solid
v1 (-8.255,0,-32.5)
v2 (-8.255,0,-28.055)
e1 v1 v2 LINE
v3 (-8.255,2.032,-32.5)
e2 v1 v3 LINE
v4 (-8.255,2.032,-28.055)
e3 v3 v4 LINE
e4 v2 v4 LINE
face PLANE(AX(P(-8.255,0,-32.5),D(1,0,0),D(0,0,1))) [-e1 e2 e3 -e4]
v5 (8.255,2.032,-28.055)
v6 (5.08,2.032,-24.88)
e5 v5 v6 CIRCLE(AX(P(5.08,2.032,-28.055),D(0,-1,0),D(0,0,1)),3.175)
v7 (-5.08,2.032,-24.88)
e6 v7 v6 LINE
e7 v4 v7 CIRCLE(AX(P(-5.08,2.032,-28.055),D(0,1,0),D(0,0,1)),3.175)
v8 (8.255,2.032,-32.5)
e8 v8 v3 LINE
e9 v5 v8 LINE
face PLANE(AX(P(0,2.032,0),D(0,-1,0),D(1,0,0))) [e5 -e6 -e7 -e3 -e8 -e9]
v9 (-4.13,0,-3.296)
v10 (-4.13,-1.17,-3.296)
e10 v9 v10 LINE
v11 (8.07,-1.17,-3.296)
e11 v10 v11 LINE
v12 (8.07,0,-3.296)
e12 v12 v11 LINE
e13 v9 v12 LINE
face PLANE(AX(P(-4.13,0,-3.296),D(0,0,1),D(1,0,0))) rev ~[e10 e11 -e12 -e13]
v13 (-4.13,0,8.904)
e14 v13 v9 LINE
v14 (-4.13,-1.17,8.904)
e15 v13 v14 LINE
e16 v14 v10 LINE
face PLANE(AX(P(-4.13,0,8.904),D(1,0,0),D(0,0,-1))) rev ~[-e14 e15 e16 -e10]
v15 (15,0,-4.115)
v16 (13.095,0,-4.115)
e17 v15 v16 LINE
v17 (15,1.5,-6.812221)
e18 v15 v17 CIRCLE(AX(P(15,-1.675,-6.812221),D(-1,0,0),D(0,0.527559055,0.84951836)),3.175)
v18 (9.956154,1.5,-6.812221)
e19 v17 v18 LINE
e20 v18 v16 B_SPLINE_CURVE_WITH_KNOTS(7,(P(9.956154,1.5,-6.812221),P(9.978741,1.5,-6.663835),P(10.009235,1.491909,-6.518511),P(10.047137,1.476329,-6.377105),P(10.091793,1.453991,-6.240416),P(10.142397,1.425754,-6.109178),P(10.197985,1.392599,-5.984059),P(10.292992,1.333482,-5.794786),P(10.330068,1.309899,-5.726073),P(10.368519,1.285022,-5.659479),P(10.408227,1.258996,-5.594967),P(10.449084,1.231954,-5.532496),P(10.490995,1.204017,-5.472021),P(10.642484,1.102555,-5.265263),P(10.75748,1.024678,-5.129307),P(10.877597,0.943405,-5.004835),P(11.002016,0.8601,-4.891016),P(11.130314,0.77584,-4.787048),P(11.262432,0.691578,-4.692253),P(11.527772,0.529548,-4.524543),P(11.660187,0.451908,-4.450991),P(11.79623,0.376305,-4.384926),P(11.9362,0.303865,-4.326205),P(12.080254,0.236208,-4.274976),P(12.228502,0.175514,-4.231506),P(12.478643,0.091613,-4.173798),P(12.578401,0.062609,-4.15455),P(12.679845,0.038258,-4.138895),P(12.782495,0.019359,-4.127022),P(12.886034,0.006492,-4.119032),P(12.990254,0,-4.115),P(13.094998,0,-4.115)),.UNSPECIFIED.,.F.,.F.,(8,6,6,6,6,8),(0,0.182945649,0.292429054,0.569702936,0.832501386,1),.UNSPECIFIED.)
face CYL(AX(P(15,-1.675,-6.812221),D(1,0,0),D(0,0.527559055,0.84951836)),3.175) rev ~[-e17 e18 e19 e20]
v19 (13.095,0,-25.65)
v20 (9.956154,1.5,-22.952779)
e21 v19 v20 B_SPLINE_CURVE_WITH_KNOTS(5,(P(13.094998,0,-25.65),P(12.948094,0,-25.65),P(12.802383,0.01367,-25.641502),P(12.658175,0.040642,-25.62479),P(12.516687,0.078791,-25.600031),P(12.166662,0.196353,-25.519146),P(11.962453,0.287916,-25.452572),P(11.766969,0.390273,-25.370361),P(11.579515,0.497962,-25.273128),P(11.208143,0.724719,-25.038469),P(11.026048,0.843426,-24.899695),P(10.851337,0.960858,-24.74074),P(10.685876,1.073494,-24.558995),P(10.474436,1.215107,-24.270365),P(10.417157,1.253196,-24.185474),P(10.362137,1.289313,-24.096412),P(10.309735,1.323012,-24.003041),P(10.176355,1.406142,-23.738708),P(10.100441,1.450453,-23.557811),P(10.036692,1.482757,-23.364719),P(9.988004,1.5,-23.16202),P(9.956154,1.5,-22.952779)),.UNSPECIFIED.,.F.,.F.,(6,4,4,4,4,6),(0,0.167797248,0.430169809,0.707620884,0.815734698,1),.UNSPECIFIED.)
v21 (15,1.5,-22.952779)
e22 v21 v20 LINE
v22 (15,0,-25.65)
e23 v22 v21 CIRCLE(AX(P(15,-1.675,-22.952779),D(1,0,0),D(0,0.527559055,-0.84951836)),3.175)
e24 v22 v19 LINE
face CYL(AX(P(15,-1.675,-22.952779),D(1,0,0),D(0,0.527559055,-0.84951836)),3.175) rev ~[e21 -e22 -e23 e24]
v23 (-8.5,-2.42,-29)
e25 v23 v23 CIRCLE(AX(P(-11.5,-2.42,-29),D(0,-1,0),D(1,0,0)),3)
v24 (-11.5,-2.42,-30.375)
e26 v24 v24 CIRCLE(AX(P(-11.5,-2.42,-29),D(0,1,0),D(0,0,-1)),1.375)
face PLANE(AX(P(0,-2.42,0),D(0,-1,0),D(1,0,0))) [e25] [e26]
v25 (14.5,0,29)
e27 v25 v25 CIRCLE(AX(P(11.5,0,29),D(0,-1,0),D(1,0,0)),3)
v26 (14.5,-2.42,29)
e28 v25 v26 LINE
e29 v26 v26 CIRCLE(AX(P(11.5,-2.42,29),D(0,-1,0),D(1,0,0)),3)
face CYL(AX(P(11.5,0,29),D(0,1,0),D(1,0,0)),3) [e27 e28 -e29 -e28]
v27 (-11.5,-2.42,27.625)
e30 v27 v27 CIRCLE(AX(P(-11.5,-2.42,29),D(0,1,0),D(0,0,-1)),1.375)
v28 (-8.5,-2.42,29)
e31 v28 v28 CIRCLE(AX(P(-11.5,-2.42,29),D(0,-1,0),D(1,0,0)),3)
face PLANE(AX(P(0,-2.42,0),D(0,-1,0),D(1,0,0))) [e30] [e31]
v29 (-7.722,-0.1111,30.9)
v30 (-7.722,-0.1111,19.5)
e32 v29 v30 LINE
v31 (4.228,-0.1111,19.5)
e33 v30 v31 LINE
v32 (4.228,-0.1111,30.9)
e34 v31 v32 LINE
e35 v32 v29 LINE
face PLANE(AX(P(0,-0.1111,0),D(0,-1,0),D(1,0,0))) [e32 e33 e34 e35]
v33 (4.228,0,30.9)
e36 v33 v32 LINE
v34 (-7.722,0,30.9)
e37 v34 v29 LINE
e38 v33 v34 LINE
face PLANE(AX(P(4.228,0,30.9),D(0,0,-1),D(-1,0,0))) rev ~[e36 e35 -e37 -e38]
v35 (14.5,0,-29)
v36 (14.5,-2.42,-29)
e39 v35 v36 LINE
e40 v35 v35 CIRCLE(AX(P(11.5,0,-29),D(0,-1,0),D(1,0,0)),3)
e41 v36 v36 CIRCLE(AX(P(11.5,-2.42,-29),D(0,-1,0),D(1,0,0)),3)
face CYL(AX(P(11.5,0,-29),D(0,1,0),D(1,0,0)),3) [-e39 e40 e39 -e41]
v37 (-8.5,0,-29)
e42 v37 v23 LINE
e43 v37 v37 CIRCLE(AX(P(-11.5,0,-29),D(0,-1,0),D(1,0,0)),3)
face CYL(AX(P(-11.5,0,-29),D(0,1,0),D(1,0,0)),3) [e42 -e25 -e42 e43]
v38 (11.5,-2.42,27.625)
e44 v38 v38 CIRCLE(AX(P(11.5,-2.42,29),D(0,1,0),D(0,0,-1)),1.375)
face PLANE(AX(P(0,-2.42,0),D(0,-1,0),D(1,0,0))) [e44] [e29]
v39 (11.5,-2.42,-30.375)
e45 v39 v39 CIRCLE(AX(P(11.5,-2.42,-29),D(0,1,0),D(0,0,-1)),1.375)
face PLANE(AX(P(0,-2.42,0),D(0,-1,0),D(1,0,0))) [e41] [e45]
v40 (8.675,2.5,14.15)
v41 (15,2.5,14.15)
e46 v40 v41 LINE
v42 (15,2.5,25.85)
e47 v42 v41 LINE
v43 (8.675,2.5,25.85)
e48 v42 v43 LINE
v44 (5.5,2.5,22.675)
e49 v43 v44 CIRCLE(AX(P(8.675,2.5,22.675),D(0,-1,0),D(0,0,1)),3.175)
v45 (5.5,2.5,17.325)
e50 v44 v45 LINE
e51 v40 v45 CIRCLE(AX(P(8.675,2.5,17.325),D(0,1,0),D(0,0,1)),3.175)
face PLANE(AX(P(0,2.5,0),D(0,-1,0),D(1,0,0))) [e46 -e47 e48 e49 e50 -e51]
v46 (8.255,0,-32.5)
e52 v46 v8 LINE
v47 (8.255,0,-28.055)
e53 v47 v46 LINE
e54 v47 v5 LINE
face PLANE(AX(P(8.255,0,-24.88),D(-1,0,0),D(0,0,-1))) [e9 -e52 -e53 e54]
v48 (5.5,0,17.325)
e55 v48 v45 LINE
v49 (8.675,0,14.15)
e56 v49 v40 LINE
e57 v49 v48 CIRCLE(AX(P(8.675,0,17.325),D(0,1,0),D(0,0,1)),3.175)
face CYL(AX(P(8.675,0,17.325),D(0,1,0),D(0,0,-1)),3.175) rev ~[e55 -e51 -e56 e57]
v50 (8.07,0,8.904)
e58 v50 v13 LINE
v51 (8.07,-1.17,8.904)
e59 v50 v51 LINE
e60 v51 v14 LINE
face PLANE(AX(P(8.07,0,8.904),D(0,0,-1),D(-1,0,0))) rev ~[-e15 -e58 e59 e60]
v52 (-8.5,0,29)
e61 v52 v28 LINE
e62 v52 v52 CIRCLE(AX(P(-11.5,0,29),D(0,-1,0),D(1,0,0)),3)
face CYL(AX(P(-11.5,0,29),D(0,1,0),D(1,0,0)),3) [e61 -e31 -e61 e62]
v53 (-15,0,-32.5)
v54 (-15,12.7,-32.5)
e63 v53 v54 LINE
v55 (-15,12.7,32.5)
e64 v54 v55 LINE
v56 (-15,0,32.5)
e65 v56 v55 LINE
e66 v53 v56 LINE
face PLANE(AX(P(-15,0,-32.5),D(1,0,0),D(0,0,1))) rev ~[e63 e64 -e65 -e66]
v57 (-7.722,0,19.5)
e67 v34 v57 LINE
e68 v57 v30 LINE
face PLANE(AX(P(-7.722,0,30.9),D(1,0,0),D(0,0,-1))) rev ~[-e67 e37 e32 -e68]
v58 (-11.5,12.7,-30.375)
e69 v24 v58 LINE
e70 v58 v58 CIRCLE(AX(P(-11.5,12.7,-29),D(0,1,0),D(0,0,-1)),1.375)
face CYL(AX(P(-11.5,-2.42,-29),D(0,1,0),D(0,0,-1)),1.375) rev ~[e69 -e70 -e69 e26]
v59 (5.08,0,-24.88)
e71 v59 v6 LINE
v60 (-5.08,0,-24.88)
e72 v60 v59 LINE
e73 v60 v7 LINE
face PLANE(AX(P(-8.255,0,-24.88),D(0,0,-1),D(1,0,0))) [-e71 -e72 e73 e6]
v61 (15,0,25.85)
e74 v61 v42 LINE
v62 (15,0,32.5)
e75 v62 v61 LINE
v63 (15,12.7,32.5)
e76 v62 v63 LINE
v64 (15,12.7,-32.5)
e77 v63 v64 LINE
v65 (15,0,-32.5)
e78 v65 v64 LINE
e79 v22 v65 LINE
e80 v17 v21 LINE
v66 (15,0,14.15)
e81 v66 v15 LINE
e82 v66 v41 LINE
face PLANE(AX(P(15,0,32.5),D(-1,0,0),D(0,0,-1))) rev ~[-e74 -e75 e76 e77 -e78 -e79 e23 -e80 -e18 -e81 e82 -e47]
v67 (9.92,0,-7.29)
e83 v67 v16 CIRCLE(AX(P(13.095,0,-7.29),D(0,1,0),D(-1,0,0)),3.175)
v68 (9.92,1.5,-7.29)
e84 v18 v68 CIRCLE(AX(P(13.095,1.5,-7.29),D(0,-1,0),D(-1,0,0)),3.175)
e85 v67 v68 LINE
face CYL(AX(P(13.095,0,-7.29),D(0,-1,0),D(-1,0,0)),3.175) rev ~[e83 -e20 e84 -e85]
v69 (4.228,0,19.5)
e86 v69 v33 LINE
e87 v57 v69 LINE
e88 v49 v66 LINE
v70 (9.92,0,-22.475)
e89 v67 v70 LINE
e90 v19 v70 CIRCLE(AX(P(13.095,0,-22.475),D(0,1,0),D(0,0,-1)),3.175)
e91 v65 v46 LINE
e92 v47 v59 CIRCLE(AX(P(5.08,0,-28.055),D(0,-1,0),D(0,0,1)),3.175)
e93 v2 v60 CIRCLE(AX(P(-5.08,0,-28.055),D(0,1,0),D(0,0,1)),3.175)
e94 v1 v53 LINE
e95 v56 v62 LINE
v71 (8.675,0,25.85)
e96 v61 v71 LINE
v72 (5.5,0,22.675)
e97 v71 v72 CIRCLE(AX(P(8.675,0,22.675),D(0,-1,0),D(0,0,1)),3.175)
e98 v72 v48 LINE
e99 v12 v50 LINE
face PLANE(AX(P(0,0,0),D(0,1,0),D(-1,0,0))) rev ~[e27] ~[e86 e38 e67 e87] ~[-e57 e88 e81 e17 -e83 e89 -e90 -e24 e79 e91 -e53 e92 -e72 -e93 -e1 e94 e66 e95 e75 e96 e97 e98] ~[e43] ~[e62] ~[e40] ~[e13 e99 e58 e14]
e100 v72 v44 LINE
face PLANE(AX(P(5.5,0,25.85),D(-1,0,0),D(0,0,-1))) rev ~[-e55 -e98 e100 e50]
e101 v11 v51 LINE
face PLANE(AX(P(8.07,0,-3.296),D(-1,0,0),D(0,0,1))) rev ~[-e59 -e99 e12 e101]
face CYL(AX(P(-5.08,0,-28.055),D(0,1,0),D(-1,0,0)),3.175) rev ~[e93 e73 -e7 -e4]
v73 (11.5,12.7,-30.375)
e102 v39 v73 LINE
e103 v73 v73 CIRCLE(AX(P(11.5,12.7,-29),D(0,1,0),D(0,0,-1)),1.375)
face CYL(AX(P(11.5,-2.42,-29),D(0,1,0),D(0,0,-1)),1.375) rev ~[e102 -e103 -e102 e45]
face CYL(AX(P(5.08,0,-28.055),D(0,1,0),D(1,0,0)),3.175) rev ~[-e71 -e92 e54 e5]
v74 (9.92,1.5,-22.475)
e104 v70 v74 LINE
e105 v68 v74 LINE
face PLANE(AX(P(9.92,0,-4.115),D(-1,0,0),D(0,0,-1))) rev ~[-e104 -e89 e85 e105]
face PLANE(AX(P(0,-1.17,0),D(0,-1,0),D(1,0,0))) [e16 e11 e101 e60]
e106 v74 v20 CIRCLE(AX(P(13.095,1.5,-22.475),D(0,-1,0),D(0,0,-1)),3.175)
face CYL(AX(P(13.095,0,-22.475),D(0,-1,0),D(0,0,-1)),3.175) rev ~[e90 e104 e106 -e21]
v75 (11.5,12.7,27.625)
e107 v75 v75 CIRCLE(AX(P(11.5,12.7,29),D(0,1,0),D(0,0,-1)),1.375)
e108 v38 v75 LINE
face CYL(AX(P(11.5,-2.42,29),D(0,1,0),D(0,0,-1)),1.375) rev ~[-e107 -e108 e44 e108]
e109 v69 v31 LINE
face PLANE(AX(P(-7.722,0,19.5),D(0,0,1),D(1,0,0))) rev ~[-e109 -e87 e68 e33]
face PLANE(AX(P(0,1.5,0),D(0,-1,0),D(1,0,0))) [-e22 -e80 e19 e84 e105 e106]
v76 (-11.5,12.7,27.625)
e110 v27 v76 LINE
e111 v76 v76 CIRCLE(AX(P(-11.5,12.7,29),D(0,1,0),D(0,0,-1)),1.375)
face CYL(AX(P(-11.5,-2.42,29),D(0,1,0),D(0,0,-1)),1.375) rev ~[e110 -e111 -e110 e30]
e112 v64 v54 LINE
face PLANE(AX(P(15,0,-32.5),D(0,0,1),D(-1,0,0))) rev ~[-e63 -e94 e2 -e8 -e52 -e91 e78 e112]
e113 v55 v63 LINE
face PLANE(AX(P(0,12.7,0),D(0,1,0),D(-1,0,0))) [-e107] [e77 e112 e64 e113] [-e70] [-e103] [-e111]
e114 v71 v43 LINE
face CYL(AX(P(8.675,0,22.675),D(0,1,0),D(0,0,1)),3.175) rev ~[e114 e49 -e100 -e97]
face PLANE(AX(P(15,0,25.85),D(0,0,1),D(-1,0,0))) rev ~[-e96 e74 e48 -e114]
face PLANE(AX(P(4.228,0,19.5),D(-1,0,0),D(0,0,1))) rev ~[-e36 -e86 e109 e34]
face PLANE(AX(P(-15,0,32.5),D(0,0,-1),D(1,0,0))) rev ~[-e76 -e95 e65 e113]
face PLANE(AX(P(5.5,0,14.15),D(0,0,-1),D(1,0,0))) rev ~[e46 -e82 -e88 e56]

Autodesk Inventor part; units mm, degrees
ref_plane "YZ Plane" through (0, 0, 0) normal (1, 0, 0) x (0, 1, 0)
ref_plane "XZ Plane" through (0, 0, 0) normal (0, 1, 0) x (-1, 0, 0)
ref_plane "XY Plane" through (0, 0, 0) normal (0, 0, 1) x (1, 0, 0)
sketch "Sketch1" plane through (0, 0, 0) normal (0, 1, 0) x (-1, 0, 0)
  line L0 (15, 32.5) -> (-15, 32.5)
  line L1 (-15, 32.5) -> (-15, -32.5)
  line L2 (-15, -32.5) -> (15, -32.5)
  line L3 (15, -32.5) -> (15, 32.5)
  point P0 (0, 0)
  dimension "d0" = 65
  dimension "d1" = 30
  dimension "d2" = 15
  dimension "d3" = 32.5
extrude "Extrusion1" add sketch "Sketch1" along normal blind 12.7
sketch "Sketch2" plane through (0, 0, 0) normal (0, -1, 0) x (1, 0, 0)
  line L0 (8.07, 8.904) -> (-4.13, 8.904)
  line L1 (-4.13, 8.904) -> (-4.13, -3.296)
  line L2 (-4.13, -3.296) -> (8.07, -3.296)
  line L3 (8.07, -3.296) -> (8.07, 8.904)
  line L4 (-15, 32.5) -> (15, 32.5) projected
  line L5 (15, 32.5) -> (15, -32.5) projected
  point P0 (0, 0)
  dimension "d6" = 12.2
  dimension "d7" = 12.2
  dimension "d8" = 23.596
  dimension "d9" = 6.93
extrude "Extrusion2" add sketch "Sketch2" along normal blind 1.17
sketch "Sketch3" plane through (0, 0, 0) normal (0, -1, 0) x (1, 0, 0)
  line L0 (15, 32.5) -> (15, -32.5) projected
  line L1 (15, 25.85) -> (5.5, 25.85)
  line L2 (5.5, 25.85) -> (5.5, 14.15)
  line L3 (5.5, 14.15) -> (15, 14.15)
  line L4 (15, 14.15) -> (15, 25.85)
  line L5 (-15, 32.5) -> (15, 32.5) projected
  point P0 (0, 0)
  dimension "d12" = 9.5
  dimension "d13" = 11.7
  dimension "d14" = 6.65
extrude "Extrusion3" cut sketch "Sketch3" against normal blind 2.5
sketch "Sketch4" plane through (0, 0, 0) normal (0, -1, 0) x (1, 0, 0)
  line L0 (15, 14.15) -> (15, -32.5) projected
  line L1 (15, -4.75) -> (10.3, -4.75)
  line L2 (10.3, -4.75) -> (10.3, -13.05)
  line L3 (10.3, -13.05) -> (15, -13.05)
  line L4 (15, -13.05) -> (15, -4.75)
  line L5 (-15, 32.5) -> (15, 32.5) projected
  point P0 (0, 0)
  dimension "d17" = 4.7
  dimension "d18" = 8.3
  dimension "d19" = 37.25
extrude "Extrusion4" cut sketch "Sketch4" against normal blind 1
sketch "Sketch5" plane through (0, 0, 0) normal (0, -1, 0) x (1, 0, 0)
  line L0 (15, -13.05) -> (15, -32.5) projected
  line L1 (10.3, -25.65) -> (15, -25.65)
  line L2 (15, -32.5) -> (-15, -32.5) projected
  line L3 (10.3, -4.75) -> (15, -4.75) projected
  line L4 (15, -25.65) -> (15, -4.115)
  line L5 (15, -4.115) -> (9.92, -4.115)
  line L6 (9.92, -4.115) -> (9.92, -25.65)
  line L7 (10.3, -25.65) -> (9.92, -25.65)
  point P0 (0, 0)
  point P1 (15, -7.29)
  dimension "d22" = 4.7
  dimension "d24" = 6.85
  dimension "d69" = 5.08
  dimension "d70" = 0.635
extrude "Extrusion5" cut sketch "Sketch5" against normal blind 1.5
sketch "Sketch6" plane through (0, 0, 0) normal (0, -1, 0) x (1, 0, 0)
  circle A0 centre (11.5, 29) radius 3
  circle A1 centre (-11.5, 29) radius 3
  circle A2 centre (-11.5, -29) radius 3
  circle A3 centre (11.5, -29) radius 3
  line L0 (15, -32.5) -> (-15, -32.5) projected
  line L1 (-15, -32.5) -> (-15, 32.5) projected
  line L2 (-15, 32.5) -> (15, 32.5) projected
  point P0 (0, 0)
  dimension "d27" = 6
  dimension "d28" = 6
  dimension "d29" = 6
  dimension "d30" = 6
  dimension "d31" = 0
  dimension "d32" = 23
  dimension "d33" = 58
  dimension "d34" = 3.5
  dimension "d35" = 23
  dimension "d37" = 0
  dimension "d38" = 3.5
  dimension "d42" = 3.5
extrude "Extrusion6" add sketch "Sketch6" along normal blind 2.42
sketch "Sketch7" plane through (11.5, -2.42, 29) normal (0, -1, 0) x (1, 0, 0)
  circle A0 centre (0, 0) radius 3 projected
  circle A1 centre (0, -58) radius 3 projected
  circle A2 centre (-23, -58) radius 3 projected
  circle A3 centre (-23, 0) radius 3 projected
  point P0 (-11.5, -29)
hole "Hole1" at (11.5, -2.42, 29) at (-11.5, -2.42, 29) at (-11.5, -2.42, -29) at (11.5, -2.42, -29) direction (0, 1, 0) diameter 2.75 depth 25.4 tip angle 118
sketch "Sketch8" plane through (0, 0, 0) normal (0, -1, 0) x (1, 0, 0)
  line L0 (15, -32.5) -> (-15, -32.5) projected
  line L1 (8.255, -32.5) -> (-8.255, -32.5)
  line L2 (-8.255, -32.5) -> (-8.255, -24.88)
  line L3 (-8.255, -24.88) -> (8.255, -24.88)
  line L4 (8.255, -24.88) -> (8.255, -32.5)
  point P0 (0, 0)
  point P1 (0, 0)
  dimension "d50" = 7.62
  dimension "d51" = 16.51
  dimension "d52" = 8.255
extrude "Extrusion7" cut sketch "Sketch8" against normal blind 2.032
sketch "Sketch9" plane through (0, 0, 0) normal (0, -1, 0) x (1, 0, 0)
  line L0 (4.228, 30.9) -> (-7.722, 30.9)
  line L1 (-7.722, 30.9) -> (-7.722, 19.5)
  line L2 (-7.722, 19.5) -> (4.228, 19.5)
  line L3 (4.228, 19.5) -> (4.228, 30.9)
  line L4 (-15, 32.5) -> (15, 32.5) projected
  line L5 (-15, -32.5) -> (-15, 32.5) projected
  line L6 (15, 32.5) -> (15, 25.85) projected
  point P0 (0, 0)
  dimension "d56" = 1.6
  dimension "d57" = 11.4
  dimension "d58" = 11.95
  dimension "d60" = 10.772
extrude "Extrusion9" add sketch "Sketch9" along normal blind 0.1111
fillet "Fillet3" radius 3.175 4 edges at (9.92, 0.75, -25.65) (9.92, 0.75, -4.115) (12.46, 1.5, -4.115) (12.46, 1.5, -25.65)
fillet "Fillet4" radius 3.175 2 edges at (-8.255, 1.016, -24.88) (8.255, 1.016, -24.88)
fillet "Fillet5" radius 3.175 2 edges at (5.5, 1.25, 25.85) (5.5, 1.25, 14.15)
equation "\"d2\" = 0.5 * d1"
equation "\"d3\" = 0.5 * d0"
equation "\"d6\" = d7"
equation "\"d28\" = d27"
equation "\"d29\" = d27"
equation "\"d30\" = d27"
equation "\"d35\" = d32"
equation "\"d52\" = 0.5 * d51"
properties part number "Heat Block for Pi" material "Aluminum 6061"
